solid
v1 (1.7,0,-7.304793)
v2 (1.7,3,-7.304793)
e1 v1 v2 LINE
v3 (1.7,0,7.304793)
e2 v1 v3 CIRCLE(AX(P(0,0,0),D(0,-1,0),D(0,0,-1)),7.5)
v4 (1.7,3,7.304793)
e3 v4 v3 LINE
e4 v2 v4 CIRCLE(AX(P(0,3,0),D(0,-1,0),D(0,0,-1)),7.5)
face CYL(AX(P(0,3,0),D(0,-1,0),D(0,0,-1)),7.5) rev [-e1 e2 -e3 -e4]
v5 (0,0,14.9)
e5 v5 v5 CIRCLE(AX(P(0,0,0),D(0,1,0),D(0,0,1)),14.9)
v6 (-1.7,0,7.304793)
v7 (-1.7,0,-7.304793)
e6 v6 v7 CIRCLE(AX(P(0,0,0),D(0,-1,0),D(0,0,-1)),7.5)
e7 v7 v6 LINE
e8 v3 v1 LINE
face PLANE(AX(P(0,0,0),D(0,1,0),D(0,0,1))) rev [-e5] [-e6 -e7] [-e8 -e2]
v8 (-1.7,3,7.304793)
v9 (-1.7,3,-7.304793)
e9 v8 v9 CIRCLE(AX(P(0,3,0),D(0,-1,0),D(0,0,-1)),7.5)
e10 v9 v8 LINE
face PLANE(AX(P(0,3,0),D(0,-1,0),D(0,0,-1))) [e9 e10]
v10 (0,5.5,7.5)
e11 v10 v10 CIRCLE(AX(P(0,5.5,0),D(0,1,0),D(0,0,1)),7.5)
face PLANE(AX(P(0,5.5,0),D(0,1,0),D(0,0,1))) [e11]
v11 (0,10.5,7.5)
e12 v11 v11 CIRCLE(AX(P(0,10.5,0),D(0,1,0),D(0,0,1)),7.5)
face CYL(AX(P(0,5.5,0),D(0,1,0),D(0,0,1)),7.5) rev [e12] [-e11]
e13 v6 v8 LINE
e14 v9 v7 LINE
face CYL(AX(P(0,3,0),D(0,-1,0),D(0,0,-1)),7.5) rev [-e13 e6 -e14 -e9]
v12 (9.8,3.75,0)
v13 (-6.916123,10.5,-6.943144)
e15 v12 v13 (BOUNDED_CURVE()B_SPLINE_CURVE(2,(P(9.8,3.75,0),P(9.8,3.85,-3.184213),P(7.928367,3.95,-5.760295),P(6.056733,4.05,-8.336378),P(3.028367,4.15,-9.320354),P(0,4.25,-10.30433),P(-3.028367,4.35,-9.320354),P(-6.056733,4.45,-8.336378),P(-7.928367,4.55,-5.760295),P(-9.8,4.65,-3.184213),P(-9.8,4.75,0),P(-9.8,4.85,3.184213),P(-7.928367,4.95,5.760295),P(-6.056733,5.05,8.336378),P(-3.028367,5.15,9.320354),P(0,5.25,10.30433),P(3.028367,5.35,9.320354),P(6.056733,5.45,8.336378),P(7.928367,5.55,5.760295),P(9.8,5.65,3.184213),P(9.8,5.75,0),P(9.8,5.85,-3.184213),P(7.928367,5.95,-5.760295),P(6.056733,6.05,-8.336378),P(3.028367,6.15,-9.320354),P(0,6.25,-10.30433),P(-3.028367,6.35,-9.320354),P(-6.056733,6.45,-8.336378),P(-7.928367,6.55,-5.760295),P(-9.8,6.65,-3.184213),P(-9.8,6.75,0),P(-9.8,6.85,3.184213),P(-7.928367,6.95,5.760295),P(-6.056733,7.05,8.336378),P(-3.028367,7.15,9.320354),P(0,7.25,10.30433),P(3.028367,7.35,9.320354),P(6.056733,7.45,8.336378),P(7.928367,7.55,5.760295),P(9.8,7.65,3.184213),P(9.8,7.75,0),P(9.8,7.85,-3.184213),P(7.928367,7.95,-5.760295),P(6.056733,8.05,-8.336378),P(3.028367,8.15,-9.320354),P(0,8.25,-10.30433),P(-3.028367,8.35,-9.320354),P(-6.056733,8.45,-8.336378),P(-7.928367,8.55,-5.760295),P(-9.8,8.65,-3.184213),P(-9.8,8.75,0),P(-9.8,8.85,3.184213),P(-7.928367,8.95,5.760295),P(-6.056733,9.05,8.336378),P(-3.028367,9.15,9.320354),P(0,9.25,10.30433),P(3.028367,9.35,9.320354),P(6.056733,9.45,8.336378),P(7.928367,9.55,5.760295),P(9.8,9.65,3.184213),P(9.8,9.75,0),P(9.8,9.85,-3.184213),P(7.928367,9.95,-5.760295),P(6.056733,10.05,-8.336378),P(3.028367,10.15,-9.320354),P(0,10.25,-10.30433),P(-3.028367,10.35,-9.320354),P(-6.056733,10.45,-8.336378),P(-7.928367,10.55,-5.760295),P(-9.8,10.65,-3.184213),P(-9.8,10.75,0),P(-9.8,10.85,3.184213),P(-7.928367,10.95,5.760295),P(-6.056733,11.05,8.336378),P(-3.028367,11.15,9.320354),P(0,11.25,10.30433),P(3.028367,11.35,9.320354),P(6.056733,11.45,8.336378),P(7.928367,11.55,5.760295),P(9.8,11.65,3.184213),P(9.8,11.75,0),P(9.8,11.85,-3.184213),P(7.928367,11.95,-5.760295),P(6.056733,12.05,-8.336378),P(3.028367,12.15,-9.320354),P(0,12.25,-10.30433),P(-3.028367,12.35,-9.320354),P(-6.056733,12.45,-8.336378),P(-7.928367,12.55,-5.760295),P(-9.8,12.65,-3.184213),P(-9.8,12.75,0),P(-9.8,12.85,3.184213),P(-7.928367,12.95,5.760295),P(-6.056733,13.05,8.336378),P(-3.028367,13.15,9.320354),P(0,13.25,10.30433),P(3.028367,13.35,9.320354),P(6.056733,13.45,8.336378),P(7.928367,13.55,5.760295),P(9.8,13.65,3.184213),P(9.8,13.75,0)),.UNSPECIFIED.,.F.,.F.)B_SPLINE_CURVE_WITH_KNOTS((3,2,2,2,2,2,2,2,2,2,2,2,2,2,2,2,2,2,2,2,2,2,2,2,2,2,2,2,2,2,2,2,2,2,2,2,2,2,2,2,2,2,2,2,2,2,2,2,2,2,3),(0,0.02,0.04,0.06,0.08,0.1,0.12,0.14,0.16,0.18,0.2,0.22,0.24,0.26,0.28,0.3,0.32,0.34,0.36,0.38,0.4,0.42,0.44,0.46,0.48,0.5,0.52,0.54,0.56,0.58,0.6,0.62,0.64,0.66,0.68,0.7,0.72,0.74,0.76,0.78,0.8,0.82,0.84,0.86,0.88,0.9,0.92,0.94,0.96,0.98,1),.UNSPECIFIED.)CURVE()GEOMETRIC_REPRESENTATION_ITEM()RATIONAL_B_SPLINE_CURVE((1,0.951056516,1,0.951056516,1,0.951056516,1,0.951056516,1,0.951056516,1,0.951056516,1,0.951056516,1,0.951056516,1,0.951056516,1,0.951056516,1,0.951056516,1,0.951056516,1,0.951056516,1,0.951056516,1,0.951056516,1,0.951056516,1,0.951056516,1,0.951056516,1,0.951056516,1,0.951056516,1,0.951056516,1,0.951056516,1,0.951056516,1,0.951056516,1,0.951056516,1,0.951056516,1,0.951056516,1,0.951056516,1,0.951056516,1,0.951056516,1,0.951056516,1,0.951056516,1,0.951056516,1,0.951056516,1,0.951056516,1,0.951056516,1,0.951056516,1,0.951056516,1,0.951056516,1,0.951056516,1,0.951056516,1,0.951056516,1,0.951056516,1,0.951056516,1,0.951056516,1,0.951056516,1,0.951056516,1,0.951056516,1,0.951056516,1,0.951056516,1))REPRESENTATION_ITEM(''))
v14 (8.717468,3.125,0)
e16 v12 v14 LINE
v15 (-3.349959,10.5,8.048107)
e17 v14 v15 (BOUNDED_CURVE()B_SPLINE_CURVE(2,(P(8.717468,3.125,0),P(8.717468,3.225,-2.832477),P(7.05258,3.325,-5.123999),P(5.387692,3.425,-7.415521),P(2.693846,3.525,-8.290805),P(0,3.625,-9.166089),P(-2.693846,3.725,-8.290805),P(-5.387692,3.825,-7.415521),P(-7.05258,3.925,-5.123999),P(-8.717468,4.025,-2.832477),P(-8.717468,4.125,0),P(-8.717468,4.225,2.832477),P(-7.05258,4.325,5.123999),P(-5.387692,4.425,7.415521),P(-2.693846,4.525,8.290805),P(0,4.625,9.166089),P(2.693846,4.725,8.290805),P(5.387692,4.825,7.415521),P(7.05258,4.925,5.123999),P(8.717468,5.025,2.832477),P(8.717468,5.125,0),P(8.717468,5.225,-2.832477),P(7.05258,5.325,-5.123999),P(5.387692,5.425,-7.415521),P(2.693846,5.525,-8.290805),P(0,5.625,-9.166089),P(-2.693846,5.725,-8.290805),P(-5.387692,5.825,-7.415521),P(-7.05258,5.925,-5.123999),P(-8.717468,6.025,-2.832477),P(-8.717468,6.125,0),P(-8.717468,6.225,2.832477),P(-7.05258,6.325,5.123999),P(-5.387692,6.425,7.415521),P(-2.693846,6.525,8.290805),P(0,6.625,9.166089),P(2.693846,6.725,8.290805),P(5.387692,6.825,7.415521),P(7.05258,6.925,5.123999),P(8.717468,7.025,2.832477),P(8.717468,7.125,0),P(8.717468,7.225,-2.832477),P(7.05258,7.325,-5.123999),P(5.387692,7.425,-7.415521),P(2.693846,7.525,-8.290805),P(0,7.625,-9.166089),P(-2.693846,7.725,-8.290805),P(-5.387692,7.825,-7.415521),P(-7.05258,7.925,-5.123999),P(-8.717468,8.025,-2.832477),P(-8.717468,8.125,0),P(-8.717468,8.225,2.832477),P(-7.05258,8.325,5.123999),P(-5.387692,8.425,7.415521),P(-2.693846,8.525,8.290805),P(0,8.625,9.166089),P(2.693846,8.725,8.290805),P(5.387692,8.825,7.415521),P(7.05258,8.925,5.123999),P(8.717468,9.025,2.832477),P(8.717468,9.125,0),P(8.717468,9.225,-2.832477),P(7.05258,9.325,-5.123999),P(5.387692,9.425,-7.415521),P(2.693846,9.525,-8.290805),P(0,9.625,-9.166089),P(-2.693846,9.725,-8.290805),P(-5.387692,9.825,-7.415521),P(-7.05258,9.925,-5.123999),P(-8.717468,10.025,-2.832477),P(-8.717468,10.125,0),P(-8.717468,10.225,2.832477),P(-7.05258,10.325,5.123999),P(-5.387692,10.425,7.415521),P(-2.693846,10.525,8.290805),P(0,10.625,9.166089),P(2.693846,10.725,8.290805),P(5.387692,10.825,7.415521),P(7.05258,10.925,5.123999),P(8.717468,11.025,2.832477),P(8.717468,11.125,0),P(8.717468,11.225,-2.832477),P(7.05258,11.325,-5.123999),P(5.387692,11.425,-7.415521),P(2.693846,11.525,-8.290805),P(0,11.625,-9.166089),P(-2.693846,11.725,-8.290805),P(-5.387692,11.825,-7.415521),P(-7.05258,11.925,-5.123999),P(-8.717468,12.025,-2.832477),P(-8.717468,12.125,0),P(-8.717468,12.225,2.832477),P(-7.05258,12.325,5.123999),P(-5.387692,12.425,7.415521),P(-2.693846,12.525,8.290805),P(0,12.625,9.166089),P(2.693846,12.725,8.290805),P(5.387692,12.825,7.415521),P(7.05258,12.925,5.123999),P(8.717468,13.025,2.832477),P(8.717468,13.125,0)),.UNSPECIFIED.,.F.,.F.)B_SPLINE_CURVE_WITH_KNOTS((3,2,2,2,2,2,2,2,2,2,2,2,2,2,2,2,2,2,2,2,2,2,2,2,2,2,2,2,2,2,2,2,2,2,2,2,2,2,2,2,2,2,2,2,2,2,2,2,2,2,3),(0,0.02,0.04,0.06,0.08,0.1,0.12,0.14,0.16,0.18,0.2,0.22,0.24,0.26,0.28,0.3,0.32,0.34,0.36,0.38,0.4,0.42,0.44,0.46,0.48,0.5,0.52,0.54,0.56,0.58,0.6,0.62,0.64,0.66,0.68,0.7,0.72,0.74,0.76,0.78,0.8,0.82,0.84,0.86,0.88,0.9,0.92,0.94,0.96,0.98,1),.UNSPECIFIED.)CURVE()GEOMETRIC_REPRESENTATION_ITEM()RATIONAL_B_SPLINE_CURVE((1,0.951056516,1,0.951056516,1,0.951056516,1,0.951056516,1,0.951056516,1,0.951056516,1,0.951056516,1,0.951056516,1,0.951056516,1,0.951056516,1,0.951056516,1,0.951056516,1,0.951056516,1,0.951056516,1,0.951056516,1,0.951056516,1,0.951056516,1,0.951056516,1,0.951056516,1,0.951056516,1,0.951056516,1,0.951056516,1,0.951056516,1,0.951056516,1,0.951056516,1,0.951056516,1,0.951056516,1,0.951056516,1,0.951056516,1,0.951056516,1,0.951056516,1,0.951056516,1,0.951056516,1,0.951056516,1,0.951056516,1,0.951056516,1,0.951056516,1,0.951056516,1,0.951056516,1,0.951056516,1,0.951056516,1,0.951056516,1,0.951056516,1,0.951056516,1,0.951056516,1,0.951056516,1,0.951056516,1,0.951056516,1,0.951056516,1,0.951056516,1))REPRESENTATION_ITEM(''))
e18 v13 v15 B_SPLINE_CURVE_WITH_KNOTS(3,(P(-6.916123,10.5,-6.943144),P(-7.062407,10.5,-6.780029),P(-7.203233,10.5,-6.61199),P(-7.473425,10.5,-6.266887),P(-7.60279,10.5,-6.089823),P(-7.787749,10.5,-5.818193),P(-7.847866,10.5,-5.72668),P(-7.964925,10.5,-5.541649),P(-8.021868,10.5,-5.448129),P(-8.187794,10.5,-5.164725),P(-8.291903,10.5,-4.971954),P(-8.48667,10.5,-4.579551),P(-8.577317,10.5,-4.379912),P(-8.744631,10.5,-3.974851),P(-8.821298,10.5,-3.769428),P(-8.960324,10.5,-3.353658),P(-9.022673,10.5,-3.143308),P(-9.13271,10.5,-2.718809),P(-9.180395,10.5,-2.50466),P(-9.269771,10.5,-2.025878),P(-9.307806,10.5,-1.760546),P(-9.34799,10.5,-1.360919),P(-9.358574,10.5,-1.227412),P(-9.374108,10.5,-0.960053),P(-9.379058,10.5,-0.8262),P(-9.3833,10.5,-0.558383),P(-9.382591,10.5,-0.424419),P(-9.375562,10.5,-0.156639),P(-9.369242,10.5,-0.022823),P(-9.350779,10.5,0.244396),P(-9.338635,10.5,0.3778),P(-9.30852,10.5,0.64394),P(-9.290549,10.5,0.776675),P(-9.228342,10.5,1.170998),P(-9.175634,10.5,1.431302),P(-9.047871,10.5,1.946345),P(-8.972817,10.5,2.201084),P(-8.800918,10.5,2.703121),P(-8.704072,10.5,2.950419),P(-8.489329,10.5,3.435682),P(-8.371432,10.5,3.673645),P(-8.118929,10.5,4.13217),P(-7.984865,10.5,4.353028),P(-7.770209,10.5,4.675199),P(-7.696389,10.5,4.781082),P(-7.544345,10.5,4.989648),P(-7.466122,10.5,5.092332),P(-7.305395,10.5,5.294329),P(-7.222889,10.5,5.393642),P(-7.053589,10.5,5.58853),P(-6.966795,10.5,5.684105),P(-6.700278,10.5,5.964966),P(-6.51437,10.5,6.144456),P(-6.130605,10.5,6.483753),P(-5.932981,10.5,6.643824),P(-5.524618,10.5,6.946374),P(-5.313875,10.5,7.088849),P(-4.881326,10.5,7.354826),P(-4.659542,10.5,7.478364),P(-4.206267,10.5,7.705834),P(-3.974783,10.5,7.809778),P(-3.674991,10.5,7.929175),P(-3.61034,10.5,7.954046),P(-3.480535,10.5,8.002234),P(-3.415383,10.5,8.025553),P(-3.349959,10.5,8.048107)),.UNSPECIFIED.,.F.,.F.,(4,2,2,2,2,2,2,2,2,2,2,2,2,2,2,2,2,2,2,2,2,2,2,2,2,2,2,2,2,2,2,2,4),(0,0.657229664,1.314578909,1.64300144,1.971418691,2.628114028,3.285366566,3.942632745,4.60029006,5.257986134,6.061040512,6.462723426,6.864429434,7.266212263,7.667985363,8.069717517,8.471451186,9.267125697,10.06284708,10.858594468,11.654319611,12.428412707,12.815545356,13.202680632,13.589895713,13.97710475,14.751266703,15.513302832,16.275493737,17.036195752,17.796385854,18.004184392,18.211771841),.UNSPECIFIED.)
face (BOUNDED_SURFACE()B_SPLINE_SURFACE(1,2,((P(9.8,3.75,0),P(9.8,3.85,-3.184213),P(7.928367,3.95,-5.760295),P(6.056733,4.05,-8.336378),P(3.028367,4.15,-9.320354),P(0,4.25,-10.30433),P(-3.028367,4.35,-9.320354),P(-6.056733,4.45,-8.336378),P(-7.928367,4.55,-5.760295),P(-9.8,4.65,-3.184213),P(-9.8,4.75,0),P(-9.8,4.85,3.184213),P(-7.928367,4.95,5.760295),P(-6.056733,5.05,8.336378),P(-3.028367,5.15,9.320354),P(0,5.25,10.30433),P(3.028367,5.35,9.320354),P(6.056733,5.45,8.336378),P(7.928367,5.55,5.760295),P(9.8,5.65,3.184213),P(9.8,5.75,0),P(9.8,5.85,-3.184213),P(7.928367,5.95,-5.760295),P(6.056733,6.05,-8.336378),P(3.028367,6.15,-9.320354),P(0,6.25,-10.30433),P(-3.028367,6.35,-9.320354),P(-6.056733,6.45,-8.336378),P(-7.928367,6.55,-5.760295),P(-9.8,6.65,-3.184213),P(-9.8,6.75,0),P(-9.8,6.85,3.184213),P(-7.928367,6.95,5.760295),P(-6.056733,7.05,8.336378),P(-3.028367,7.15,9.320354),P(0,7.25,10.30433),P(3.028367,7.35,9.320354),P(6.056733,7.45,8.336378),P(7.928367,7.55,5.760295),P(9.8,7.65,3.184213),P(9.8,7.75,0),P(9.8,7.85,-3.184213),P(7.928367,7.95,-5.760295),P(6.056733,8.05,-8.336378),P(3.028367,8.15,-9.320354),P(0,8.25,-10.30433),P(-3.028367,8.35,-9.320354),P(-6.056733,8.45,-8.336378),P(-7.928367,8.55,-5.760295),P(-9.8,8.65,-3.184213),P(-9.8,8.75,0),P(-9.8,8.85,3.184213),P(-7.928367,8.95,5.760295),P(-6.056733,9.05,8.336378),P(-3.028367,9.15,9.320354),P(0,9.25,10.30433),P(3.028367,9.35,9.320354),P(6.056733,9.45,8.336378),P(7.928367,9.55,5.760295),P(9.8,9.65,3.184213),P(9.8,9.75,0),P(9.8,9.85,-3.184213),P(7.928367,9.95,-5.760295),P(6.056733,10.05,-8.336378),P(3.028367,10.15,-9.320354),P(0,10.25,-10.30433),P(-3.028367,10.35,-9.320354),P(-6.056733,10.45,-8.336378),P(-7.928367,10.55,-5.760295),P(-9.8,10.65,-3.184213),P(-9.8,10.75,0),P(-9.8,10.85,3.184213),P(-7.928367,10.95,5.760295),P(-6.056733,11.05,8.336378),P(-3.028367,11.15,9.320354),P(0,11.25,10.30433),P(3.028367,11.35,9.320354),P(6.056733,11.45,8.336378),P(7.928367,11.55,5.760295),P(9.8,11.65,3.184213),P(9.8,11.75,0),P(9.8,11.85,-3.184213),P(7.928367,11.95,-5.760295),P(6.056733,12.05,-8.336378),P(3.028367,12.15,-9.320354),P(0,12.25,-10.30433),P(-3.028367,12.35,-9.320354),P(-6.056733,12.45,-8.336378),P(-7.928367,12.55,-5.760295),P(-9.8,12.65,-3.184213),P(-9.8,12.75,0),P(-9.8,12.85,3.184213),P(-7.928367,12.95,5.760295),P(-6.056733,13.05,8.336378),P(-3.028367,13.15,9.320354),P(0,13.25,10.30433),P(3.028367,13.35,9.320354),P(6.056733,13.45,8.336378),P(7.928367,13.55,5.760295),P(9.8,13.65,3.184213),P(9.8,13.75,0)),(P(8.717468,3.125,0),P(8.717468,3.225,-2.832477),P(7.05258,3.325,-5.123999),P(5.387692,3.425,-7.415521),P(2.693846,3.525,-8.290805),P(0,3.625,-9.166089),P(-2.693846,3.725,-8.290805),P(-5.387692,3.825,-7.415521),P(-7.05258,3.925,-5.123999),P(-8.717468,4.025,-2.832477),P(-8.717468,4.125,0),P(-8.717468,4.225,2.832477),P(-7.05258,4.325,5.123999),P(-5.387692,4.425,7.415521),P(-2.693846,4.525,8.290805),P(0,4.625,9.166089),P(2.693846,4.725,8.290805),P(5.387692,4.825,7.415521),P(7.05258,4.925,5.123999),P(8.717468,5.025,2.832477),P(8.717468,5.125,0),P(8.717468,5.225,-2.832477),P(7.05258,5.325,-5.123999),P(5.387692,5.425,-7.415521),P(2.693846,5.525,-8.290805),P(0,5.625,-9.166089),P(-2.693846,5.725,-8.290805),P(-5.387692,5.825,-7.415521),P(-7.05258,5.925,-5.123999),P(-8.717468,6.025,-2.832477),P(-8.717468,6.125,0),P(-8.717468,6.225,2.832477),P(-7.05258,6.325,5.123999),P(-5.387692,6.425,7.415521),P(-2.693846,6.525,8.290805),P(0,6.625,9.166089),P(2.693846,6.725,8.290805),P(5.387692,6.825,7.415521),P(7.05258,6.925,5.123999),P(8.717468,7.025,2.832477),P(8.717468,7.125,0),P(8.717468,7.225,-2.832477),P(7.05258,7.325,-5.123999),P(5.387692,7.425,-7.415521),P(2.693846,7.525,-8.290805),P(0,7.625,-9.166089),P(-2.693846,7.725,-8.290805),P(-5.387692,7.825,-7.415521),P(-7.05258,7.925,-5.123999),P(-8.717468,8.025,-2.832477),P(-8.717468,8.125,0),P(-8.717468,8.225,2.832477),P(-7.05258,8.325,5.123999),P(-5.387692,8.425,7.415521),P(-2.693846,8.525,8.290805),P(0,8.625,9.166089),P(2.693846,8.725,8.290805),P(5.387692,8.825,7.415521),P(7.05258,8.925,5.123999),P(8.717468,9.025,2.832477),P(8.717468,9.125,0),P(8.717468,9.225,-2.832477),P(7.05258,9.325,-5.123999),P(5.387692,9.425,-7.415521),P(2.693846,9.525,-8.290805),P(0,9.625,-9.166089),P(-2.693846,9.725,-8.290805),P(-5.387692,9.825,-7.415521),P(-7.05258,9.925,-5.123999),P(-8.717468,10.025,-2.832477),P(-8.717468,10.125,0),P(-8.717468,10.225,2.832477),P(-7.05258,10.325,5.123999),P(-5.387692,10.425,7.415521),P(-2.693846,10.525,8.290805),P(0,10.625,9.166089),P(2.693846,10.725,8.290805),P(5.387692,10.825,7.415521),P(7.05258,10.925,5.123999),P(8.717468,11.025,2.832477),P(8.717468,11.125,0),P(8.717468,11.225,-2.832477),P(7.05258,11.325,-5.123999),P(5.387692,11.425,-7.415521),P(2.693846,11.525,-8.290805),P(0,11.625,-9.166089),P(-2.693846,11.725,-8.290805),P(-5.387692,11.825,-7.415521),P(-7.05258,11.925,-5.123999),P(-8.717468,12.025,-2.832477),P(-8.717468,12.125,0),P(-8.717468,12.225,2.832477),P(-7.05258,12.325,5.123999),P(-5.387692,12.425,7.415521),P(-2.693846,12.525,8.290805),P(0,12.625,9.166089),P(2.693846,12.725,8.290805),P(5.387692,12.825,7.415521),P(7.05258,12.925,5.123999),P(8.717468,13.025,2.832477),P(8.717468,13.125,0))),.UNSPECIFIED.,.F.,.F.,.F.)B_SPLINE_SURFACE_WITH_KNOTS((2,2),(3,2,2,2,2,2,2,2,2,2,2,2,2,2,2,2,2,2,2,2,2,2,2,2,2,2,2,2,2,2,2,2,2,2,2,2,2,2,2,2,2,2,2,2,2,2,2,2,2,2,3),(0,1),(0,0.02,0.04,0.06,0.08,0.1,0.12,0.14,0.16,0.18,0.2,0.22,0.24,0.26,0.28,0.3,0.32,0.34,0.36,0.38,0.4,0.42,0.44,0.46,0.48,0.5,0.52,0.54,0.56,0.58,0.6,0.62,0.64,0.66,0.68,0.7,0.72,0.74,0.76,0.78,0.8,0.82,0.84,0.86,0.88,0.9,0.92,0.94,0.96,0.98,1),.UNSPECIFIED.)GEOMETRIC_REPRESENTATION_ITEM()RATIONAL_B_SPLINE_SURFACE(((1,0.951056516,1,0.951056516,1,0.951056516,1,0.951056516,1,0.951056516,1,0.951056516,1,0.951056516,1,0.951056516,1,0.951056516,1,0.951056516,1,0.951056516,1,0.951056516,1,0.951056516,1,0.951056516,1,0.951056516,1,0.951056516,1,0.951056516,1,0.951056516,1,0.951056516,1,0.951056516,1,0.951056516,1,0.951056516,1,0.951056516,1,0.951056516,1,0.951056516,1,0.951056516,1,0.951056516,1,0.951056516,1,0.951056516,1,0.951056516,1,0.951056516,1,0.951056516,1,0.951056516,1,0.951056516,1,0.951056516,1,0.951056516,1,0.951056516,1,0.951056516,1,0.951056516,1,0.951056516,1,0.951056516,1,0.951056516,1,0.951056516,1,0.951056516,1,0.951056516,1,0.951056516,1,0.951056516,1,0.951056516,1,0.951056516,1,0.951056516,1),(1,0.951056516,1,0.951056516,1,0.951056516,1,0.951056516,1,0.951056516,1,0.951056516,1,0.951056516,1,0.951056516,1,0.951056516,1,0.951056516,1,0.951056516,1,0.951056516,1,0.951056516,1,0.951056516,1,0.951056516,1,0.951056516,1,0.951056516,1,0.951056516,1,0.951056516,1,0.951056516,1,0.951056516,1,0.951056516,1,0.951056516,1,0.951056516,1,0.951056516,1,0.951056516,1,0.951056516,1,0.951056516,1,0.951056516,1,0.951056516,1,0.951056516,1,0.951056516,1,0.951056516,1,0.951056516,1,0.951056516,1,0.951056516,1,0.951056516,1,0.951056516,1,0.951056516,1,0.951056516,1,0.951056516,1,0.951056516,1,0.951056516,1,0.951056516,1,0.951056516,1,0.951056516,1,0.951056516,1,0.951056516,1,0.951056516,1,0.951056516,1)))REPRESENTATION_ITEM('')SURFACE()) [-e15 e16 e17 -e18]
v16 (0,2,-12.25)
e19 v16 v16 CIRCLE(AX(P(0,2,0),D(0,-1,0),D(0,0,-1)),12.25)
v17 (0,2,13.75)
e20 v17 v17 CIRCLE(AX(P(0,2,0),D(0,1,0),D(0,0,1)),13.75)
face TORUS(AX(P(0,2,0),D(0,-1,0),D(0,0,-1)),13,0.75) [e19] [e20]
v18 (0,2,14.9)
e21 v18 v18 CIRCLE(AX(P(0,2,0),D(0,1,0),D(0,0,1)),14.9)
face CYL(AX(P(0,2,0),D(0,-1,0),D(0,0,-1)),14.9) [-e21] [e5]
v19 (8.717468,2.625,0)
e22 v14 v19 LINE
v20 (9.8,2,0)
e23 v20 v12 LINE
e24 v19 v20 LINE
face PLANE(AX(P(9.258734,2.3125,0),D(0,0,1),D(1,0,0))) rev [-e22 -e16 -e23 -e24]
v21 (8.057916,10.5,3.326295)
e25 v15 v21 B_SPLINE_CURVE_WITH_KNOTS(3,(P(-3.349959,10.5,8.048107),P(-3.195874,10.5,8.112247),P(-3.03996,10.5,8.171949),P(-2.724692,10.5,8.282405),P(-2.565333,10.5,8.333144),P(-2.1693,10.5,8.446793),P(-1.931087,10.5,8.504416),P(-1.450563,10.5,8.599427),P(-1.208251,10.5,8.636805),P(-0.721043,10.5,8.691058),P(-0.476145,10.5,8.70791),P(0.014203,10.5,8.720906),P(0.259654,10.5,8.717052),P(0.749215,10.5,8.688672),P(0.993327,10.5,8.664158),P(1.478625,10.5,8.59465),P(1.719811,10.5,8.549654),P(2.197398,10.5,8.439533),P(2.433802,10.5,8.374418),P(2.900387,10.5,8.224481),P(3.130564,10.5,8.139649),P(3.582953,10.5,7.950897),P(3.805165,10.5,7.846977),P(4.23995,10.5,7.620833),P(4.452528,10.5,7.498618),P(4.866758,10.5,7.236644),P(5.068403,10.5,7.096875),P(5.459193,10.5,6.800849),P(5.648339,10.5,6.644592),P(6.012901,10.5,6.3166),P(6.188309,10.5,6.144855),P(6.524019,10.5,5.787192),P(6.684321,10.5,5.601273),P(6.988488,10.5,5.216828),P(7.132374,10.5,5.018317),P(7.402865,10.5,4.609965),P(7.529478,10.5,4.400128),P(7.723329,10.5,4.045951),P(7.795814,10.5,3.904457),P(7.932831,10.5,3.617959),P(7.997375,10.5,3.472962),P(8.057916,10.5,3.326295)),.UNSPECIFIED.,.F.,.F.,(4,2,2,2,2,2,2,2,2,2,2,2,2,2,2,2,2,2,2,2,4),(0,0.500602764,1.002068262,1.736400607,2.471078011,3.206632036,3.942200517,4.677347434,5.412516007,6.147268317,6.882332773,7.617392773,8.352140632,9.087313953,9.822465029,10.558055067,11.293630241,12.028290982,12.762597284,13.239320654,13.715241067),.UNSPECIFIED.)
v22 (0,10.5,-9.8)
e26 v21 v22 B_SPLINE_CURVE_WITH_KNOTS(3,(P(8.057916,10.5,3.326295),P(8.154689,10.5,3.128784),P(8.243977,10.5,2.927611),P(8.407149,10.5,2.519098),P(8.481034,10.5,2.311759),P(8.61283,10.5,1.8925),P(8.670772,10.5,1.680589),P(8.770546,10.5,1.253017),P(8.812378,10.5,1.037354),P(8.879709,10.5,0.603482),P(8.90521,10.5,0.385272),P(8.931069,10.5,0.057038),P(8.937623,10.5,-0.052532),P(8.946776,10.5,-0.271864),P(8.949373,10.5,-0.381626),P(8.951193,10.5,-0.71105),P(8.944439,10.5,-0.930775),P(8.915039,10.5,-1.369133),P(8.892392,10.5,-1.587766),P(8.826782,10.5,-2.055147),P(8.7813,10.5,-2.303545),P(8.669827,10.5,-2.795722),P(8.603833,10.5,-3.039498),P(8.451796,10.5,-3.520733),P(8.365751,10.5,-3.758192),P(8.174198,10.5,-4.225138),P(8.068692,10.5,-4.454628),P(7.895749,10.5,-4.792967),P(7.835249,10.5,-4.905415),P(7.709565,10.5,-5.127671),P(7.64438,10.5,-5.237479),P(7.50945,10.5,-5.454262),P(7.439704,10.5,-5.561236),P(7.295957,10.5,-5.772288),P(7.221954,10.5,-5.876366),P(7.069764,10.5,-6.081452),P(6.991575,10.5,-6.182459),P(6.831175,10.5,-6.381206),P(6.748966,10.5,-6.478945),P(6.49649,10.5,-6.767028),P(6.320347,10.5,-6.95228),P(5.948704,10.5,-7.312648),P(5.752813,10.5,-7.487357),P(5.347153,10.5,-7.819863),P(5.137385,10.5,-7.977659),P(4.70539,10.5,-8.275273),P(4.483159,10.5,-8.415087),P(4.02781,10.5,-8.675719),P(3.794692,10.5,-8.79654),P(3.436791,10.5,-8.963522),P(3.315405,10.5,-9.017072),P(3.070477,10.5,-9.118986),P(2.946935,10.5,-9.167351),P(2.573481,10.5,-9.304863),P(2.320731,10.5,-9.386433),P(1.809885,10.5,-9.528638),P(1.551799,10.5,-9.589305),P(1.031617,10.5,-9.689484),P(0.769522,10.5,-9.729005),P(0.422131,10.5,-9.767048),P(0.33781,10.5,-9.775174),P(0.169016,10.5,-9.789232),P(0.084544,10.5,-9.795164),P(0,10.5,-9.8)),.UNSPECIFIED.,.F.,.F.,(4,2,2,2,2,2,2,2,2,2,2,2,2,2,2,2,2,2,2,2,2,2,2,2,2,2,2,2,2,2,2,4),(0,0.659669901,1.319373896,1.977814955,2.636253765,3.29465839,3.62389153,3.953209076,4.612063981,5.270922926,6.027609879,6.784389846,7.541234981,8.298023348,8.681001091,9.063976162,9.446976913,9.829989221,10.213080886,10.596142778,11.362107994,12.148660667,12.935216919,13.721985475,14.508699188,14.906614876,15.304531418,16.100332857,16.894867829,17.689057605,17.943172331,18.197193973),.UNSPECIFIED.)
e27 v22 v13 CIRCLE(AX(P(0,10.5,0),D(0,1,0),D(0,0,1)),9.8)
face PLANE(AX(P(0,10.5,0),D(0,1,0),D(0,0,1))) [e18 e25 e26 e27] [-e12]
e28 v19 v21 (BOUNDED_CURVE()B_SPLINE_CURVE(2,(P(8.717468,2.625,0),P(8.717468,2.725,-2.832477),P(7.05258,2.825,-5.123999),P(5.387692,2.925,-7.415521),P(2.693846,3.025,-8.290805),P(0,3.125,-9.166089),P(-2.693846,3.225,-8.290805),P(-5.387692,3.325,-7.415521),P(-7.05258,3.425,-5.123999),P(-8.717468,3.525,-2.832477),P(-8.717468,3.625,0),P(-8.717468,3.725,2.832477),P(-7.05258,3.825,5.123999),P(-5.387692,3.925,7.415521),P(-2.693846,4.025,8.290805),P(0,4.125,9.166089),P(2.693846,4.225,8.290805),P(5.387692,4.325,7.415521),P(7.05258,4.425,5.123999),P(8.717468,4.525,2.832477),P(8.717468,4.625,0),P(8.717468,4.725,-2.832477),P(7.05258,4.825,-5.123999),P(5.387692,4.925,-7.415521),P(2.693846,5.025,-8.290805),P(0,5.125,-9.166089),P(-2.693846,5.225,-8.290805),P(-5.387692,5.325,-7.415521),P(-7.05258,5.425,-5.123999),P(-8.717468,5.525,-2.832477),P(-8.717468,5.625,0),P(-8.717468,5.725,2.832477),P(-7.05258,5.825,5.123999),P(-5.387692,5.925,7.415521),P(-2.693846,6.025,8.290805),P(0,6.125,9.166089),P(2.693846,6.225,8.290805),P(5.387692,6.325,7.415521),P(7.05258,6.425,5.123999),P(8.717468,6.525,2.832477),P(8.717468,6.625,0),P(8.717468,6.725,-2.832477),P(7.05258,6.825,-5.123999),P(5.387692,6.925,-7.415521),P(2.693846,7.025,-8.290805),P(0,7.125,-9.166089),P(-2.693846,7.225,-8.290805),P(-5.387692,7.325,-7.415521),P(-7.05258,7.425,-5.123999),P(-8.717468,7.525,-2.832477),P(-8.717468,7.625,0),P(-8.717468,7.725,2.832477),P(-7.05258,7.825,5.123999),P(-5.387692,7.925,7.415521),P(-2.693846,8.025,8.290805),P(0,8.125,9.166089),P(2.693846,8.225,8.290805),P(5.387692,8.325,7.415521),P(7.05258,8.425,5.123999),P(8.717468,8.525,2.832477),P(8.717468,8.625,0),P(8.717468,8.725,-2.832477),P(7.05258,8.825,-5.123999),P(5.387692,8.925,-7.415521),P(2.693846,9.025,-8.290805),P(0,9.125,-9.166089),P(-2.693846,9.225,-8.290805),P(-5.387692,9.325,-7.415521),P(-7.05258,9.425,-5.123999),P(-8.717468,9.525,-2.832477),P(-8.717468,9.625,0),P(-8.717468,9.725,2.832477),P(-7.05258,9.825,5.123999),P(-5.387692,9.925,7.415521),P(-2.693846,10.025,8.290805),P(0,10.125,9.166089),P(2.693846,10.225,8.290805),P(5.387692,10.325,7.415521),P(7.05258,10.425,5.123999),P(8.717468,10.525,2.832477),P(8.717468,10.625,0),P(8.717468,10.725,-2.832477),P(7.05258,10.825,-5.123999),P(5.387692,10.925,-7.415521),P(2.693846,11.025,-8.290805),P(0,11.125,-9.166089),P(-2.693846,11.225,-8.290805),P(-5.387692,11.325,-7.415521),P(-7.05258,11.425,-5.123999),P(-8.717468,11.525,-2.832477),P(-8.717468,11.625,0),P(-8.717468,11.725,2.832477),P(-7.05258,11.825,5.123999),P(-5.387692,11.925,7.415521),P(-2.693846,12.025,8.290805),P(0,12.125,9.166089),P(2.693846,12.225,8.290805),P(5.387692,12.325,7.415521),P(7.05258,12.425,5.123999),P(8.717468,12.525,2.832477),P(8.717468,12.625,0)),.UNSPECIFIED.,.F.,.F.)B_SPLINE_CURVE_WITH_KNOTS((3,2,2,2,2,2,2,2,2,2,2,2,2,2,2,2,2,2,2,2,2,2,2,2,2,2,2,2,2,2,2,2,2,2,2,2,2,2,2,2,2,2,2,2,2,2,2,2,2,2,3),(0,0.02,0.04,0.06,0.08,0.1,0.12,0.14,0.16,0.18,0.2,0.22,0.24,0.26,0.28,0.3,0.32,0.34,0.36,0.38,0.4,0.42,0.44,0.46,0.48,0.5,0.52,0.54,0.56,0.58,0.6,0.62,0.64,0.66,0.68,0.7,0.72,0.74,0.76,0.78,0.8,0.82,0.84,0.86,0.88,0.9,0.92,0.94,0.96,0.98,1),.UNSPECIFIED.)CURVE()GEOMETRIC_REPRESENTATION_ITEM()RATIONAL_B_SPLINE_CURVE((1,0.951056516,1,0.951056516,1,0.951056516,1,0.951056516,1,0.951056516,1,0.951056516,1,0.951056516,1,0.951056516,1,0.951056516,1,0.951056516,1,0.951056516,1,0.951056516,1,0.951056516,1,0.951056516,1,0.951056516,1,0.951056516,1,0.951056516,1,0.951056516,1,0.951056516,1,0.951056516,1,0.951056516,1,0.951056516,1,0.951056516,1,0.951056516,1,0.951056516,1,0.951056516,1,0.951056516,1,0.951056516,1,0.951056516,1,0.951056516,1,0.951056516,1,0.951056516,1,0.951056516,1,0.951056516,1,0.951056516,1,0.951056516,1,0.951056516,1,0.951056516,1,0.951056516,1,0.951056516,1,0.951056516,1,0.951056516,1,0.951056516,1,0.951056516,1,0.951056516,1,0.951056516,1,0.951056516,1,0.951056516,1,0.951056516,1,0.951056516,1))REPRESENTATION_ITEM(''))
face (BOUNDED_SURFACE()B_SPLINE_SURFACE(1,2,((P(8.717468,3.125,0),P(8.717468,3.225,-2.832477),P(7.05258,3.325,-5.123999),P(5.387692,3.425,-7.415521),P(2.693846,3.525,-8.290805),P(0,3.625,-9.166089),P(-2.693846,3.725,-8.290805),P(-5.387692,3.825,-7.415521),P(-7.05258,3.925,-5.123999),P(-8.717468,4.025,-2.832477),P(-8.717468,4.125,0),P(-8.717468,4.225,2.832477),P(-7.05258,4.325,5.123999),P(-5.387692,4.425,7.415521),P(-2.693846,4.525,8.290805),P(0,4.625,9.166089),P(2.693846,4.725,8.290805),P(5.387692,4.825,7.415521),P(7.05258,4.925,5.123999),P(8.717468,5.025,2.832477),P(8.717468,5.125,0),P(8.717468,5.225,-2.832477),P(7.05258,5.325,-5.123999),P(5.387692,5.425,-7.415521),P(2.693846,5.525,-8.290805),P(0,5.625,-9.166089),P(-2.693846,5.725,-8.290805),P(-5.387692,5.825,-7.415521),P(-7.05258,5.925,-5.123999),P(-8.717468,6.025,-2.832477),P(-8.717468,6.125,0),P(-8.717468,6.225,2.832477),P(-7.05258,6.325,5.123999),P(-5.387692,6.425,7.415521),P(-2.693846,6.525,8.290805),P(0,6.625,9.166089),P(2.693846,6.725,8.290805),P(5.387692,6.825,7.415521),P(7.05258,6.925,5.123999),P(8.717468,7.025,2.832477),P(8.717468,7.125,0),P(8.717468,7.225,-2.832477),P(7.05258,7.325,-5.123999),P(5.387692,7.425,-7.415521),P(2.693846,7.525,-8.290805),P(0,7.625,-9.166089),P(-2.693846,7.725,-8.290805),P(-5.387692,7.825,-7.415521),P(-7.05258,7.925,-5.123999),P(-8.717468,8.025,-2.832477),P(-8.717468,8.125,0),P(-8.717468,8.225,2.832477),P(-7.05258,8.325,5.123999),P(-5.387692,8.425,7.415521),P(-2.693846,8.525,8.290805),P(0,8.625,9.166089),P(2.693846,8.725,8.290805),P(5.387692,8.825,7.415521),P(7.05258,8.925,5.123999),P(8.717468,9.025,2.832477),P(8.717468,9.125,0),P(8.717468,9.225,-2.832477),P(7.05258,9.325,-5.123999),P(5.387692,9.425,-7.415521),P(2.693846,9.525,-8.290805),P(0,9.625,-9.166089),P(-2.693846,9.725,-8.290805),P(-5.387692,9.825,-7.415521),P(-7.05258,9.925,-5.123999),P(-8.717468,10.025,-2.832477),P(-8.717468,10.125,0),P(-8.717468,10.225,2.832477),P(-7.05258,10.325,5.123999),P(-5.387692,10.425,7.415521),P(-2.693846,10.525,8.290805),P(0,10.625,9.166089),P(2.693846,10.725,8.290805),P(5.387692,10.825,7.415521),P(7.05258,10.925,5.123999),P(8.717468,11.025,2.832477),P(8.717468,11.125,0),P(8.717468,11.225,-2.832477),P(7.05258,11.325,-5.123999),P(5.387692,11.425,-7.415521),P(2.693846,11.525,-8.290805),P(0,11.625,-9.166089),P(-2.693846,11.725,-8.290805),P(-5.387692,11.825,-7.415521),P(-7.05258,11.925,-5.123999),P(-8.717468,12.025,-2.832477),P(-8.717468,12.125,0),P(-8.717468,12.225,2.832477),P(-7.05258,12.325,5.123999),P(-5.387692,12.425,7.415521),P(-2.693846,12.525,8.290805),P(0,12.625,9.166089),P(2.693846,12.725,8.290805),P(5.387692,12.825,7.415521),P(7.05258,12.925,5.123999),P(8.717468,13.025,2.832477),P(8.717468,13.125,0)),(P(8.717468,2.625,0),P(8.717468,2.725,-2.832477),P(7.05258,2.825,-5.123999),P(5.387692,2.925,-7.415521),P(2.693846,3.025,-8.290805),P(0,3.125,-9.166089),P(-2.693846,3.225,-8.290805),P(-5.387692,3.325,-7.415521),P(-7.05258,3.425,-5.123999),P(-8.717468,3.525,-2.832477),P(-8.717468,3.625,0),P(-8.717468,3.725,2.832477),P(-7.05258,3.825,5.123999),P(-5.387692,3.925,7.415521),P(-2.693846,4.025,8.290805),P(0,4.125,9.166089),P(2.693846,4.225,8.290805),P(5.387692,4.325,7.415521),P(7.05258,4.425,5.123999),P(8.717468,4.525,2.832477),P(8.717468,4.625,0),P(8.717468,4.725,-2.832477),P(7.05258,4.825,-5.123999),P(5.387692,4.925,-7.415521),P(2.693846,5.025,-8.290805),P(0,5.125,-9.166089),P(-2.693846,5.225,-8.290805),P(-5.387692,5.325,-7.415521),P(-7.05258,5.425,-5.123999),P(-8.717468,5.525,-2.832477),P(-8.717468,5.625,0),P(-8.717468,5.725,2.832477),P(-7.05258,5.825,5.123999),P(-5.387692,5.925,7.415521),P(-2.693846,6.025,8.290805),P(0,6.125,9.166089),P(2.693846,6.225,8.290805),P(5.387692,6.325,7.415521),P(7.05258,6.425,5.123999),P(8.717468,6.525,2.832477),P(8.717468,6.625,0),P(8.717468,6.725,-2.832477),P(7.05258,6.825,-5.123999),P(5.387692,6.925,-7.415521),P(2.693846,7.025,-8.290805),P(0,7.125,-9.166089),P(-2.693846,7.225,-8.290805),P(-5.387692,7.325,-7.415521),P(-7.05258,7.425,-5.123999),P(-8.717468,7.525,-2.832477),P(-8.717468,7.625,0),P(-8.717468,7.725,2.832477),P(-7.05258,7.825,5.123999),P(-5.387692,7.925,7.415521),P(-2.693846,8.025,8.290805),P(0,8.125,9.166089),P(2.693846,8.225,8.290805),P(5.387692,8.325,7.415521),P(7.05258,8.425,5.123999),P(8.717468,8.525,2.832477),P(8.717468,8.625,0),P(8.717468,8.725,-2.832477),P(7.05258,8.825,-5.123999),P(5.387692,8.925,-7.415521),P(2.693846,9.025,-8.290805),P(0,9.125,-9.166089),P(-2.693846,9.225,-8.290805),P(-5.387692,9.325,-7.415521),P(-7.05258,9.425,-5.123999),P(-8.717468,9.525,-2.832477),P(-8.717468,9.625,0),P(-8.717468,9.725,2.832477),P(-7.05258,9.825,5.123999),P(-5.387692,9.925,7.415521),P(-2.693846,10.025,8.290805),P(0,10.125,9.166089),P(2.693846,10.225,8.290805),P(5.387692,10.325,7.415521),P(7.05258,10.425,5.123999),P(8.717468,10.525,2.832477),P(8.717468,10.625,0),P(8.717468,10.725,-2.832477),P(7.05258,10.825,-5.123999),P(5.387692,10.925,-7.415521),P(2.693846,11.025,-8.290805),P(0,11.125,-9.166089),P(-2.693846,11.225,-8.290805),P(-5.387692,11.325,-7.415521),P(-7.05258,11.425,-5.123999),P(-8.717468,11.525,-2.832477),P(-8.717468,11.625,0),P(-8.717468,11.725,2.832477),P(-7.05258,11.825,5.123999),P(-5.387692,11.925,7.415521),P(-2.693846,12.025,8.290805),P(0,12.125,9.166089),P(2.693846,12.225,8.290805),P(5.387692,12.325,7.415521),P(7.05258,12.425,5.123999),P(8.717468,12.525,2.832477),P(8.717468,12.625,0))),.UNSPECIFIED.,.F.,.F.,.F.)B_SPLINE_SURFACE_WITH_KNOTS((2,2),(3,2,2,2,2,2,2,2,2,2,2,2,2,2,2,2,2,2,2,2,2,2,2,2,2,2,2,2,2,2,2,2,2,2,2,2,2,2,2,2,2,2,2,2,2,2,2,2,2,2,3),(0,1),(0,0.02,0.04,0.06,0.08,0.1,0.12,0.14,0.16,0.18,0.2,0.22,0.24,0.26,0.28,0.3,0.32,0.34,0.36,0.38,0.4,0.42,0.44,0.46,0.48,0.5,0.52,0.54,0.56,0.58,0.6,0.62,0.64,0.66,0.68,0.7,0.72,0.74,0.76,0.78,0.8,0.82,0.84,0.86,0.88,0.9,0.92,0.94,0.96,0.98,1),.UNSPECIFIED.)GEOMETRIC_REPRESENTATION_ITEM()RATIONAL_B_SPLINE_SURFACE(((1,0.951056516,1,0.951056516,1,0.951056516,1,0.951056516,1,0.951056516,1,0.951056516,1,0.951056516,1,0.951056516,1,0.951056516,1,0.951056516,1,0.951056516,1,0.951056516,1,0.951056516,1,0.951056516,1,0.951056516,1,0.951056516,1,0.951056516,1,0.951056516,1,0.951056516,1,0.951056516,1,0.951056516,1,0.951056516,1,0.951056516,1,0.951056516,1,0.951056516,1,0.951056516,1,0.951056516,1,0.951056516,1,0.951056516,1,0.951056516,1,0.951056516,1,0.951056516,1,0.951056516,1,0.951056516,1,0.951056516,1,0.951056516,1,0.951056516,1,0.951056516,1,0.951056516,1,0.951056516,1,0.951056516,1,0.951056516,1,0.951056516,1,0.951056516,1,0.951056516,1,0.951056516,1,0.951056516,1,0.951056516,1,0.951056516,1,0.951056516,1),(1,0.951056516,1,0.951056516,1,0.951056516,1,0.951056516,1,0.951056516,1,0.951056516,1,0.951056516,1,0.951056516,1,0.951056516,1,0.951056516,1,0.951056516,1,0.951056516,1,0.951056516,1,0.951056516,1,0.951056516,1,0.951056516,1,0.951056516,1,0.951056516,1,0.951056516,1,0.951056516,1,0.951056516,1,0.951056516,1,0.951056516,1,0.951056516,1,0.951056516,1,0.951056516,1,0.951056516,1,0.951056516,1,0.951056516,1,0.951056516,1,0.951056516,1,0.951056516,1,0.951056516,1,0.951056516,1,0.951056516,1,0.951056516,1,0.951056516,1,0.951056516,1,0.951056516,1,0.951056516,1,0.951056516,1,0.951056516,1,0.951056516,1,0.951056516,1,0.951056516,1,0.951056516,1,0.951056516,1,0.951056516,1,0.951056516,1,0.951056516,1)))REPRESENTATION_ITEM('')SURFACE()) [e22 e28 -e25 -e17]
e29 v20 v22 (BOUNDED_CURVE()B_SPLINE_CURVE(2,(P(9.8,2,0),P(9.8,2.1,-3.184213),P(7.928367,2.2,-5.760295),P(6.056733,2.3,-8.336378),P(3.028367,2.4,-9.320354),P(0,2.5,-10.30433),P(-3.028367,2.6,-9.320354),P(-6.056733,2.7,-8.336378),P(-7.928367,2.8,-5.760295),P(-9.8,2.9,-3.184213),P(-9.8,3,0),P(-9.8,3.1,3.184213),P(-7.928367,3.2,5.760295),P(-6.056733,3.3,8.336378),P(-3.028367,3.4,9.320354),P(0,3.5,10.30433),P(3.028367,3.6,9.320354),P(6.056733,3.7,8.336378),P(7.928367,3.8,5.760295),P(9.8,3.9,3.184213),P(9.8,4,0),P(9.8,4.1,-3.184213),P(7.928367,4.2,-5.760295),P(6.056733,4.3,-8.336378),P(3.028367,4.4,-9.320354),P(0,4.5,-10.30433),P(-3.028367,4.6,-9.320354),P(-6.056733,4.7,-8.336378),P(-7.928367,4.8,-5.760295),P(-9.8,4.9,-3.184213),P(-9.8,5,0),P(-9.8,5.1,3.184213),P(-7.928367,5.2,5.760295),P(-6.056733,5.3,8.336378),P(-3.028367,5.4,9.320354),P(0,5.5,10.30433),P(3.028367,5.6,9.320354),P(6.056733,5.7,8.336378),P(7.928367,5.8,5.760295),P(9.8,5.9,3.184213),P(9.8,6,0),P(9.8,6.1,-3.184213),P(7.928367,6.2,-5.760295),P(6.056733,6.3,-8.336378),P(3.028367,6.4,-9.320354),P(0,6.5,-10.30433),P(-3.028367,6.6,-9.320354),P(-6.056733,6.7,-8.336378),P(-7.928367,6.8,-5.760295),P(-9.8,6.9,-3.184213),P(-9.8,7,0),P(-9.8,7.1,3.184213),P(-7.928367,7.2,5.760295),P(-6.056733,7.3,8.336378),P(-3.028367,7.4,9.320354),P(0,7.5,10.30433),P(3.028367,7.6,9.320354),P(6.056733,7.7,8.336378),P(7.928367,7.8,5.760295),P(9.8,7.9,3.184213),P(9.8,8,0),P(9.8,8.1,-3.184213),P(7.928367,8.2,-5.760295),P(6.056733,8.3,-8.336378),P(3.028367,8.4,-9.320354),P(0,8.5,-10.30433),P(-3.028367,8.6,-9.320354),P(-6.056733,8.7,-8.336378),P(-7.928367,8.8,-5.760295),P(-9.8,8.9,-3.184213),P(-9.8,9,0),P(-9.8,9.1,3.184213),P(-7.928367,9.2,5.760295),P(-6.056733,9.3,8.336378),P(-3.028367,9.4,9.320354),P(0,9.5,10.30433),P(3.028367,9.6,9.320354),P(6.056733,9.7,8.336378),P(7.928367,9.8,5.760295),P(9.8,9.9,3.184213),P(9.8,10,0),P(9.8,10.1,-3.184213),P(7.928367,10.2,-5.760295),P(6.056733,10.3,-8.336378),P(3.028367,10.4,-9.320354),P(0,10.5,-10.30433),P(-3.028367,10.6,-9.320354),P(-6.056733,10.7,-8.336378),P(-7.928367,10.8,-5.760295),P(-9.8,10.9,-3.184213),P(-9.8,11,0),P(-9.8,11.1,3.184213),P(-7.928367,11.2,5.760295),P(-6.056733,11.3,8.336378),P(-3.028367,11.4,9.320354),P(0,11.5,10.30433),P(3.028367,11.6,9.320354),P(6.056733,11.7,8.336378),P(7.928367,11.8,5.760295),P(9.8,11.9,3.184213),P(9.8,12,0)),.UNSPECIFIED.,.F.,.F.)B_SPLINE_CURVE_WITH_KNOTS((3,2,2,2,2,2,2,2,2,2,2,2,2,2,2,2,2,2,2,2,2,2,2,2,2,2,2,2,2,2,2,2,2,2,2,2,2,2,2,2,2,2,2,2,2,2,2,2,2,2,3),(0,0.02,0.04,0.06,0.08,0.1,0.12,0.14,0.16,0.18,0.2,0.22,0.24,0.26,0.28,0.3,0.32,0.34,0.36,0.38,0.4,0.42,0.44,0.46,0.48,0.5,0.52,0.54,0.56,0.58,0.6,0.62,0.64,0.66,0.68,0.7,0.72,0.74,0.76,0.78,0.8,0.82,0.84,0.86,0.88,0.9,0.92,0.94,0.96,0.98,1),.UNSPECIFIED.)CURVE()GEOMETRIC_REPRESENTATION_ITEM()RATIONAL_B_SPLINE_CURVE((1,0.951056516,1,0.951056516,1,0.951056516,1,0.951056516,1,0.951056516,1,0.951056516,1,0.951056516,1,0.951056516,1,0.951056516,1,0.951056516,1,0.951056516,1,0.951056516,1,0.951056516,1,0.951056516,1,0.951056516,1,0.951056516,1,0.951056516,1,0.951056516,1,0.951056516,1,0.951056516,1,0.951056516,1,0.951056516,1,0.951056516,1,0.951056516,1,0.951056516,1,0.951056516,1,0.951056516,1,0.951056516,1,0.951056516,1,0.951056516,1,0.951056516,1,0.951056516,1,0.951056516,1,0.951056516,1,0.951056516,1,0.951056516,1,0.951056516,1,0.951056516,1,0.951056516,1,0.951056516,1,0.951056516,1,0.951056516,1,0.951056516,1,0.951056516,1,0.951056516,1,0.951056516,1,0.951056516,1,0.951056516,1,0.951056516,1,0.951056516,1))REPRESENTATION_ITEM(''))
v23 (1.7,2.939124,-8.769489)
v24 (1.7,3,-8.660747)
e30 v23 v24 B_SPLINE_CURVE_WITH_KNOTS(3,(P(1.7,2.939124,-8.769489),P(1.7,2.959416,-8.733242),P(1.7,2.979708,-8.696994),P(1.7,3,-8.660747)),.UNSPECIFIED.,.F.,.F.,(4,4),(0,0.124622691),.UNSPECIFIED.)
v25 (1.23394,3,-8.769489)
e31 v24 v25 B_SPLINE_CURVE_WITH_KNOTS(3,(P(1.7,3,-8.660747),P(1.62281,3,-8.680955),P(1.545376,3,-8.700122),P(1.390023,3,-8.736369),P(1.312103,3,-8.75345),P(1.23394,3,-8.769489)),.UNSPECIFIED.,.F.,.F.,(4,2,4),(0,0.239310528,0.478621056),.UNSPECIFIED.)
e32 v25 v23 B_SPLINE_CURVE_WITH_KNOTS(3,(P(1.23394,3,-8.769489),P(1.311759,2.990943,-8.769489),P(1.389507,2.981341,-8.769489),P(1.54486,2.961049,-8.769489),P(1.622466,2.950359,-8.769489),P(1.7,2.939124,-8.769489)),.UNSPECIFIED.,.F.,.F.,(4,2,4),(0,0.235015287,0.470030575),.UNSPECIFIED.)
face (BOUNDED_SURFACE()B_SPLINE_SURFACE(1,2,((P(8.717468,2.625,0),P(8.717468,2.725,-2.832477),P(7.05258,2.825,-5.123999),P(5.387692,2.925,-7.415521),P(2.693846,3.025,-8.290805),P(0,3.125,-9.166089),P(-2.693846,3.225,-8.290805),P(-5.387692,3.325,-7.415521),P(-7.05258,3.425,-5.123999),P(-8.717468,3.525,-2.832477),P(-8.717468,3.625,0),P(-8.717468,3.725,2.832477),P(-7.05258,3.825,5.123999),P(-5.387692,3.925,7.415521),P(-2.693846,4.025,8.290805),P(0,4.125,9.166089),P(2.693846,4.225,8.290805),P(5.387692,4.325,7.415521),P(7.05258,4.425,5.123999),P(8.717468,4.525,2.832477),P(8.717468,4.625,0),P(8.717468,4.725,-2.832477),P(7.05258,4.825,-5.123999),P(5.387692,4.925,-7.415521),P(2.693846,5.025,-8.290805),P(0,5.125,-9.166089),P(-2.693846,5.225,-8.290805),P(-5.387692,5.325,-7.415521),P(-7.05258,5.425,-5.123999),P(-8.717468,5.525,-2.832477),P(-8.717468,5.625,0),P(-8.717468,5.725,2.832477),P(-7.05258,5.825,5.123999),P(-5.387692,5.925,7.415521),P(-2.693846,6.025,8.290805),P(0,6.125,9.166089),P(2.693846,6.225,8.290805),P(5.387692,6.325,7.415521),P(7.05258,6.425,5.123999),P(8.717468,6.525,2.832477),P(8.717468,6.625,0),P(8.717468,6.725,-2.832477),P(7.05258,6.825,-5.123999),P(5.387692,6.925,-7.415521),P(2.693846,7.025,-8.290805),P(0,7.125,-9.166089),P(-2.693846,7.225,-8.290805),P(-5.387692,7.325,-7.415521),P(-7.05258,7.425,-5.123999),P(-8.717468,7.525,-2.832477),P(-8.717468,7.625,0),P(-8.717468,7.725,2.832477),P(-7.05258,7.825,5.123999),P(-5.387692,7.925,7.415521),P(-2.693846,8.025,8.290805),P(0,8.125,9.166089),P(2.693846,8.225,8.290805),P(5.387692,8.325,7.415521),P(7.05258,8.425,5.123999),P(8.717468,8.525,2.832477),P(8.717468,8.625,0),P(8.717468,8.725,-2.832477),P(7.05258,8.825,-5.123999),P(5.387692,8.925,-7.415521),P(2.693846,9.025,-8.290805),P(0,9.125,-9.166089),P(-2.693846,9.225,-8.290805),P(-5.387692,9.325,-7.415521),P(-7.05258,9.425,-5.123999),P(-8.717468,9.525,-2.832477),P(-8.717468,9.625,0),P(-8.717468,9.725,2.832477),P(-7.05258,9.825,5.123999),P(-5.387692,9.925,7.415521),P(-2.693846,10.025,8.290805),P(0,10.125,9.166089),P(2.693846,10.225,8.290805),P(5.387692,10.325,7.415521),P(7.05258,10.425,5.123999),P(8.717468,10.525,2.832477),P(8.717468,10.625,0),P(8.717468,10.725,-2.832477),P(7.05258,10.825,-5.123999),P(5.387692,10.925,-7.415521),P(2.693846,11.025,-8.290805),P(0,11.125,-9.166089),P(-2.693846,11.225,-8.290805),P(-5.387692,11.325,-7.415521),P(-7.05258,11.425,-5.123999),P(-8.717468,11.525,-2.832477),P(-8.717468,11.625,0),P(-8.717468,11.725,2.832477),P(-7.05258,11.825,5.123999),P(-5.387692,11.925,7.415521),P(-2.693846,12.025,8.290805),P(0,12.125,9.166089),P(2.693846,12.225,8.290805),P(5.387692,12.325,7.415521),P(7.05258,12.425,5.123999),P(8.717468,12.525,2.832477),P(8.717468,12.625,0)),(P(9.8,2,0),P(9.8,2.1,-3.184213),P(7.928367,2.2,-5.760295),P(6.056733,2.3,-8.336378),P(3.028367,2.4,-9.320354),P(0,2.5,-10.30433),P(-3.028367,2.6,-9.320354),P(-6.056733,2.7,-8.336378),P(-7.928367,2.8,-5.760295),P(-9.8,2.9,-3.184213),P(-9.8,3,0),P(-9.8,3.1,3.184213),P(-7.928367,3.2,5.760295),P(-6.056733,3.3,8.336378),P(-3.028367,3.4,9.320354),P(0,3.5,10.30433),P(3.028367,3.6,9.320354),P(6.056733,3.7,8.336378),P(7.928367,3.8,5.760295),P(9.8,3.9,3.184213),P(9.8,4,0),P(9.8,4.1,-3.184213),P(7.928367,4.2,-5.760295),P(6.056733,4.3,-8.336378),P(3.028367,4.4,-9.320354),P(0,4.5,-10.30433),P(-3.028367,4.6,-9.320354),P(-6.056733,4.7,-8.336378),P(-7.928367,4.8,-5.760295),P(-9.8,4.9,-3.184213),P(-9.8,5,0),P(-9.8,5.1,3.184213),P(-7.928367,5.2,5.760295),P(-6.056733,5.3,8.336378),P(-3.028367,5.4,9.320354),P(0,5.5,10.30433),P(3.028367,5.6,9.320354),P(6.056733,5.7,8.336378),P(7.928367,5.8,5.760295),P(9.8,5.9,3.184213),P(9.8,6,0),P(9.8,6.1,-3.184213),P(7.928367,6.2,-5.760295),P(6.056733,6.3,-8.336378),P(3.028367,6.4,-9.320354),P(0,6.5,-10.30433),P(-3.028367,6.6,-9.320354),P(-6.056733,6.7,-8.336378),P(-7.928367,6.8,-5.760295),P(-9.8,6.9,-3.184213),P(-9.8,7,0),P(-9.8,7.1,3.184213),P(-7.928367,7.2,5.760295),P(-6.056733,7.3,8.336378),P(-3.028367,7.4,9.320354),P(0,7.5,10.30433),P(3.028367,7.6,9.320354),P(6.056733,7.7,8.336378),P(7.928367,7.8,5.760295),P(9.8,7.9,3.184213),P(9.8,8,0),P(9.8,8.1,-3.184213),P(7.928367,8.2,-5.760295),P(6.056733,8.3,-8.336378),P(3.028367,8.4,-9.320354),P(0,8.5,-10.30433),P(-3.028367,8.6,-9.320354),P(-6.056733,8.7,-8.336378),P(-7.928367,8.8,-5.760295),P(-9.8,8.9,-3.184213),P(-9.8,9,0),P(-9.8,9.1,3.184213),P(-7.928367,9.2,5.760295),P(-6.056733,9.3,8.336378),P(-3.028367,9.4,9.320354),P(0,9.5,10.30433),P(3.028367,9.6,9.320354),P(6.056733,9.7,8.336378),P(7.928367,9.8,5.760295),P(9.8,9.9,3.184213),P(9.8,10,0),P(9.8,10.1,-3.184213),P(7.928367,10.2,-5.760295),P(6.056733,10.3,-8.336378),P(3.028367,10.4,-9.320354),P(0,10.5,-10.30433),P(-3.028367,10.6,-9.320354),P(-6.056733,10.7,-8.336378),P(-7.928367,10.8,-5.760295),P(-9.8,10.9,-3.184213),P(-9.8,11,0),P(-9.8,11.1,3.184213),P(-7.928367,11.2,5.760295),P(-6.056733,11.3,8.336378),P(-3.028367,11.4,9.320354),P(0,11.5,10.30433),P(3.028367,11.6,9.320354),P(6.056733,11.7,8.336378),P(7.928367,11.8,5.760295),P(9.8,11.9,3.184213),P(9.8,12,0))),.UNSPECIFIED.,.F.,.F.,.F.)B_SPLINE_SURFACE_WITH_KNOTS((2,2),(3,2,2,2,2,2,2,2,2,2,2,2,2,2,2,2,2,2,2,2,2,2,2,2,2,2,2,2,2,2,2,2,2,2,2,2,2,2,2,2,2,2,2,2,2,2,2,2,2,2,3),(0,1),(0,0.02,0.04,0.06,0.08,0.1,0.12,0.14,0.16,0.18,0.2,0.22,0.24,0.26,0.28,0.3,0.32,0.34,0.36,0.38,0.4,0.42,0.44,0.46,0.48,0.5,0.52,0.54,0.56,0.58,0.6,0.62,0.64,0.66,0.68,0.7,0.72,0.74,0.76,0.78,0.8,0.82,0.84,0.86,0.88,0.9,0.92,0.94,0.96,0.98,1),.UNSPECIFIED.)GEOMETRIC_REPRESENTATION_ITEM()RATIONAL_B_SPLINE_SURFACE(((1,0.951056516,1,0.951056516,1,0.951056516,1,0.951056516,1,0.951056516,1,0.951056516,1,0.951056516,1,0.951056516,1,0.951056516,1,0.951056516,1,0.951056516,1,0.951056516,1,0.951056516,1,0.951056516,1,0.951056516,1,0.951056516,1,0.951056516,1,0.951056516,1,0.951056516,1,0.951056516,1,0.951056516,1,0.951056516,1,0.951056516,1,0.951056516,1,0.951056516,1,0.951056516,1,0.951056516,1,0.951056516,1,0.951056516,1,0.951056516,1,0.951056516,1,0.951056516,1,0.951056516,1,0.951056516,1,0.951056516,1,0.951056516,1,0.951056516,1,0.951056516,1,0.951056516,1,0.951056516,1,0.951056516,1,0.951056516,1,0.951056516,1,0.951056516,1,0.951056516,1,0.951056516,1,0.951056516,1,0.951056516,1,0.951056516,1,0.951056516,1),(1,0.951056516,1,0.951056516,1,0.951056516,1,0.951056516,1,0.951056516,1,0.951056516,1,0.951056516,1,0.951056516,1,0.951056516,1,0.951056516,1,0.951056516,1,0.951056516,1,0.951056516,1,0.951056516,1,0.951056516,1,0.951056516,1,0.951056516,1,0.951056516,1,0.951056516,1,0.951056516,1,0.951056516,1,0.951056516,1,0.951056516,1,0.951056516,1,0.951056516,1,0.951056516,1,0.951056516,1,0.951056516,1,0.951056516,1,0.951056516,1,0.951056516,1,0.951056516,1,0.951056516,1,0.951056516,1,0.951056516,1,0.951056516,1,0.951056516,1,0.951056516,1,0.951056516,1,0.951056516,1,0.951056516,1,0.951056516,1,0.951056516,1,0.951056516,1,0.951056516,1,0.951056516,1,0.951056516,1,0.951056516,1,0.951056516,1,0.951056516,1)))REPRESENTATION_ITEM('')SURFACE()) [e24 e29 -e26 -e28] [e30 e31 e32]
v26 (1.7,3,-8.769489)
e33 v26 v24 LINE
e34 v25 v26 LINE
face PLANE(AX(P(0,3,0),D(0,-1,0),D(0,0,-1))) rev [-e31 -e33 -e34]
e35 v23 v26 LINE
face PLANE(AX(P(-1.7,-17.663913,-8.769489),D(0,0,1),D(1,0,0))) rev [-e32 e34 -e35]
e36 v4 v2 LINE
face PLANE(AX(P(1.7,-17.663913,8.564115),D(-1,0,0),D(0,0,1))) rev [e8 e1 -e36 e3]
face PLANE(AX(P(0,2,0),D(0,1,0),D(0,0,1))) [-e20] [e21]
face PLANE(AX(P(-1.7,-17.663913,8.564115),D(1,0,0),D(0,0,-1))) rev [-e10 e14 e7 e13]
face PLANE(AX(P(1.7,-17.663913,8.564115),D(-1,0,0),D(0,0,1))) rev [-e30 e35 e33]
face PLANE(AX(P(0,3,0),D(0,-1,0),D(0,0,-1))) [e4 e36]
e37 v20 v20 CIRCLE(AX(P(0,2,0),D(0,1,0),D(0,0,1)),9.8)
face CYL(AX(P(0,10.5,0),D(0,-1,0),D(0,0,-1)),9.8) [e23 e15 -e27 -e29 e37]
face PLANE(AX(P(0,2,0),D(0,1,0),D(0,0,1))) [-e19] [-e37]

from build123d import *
from build123d.topology import SkipClean

# Parameters (mm, degrees)
SKETCH1_R           = 14.9
BOSS_EXTRUDE1_DEPTH = 2
SKETCH2_R           = 9.8
BOSS_EXTRUDE2_DEPTH = 8.5
SKETCH3_R           = 7.5
CUT_EXTRUDE1_DEPTH  = 5
THREAD1_PITCH       = 2
CUT_EXTRUDE2_START  = -3
SKETCH7_R           = 7.5
CUT_EXTRUDE2_DEPTH  = 3
SKETCH9_W           = 3.4
SKETCH9_H           = 17.333603835
BOSS_EXTRUDE3_DEPTH = 3
SKETCH10_R          = 0.75


with BuildPart() as part:
    # Sketch1 → Boss-Extrude1 (new body)
    with BuildSketch(Plane(origin=(0, 0, 0), x_dir=(1, 0, 0), z_dir=(0, 1, 0))):
        with Locations(Location((0, 0, 0), (0, 0, 270))):
            Circle(SKETCH1_R)
    extrude(amount=BOSS_EXTRUDE1_DEPTH)

    # Sketch2 → Boss-Extrude2 (add)
    with BuildSketch(Plane(origin=(0, 2, 0), x_dir=(1, 0, 0), z_dir=(0, 1, 0))):
        with Locations(Location((0, 0, 0), (0, 0, 270))):
            Circle(SKETCH2_R)
    extrude(amount=BOSS_EXTRUDE2_DEPTH)

    # Sketch3 → Cut-Extrude1 (cut)
    with BuildSketch(Plane(origin=(0, 10.5, 0), x_dir=(1, 0, 0), z_dir=(0, 1, 0))):
        with Locations(Location((0, 0, 0), (0, 0, 270))):
            Circle(SKETCH3_R)
    extrude(amount=-CUT_EXTRUDE1_DEPTH, mode=Mode.SUBTRACT)

    # Thread1: the profile of Sketch5 profile screwed along a right-hand helix of 5 turns, 10 arcs to a turn; built about Z, then put on its axis
    with SkipClean():  # the faces are left unmerged after this step: merging them gives an invalid solid
        thread1_z = Axis((0, 0, 0), (0, 0, 1))
        thread1_corners = [(9.8003, 0, -0.000173205), (9.8003, 0, 1.7501732), (8.71746825, 0, 1.124999997), (8.71746825, 0, 0.624999997)]
        with BuildLine(mode=Mode.PRIVATE) as thread1_profile:
            Line(thread1_corners[0], thread1_corners[1])
            Line(thread1_corners[1], thread1_corners[2])
            Line(thread1_corners[2], thread1_corners[3])
            Line(thread1_corners[3], thread1_corners[0])
        thread1_cap = Face(thread1_profile.wire())
        thread1_turn_angles = [0, 18, 36, 54, 72, 90, 108, 126, 144, 162, 180, 198, 216, 234, 252, 270, 288, 306, 324, 342, 360]
        thread1_turn_weights = [1, 0.9510565162951535, 1, 0.9510565162951535, 1, 0.9510565162951535, 1, 0.9510565162951535, 1, 0.9510565162951535, 1, 0.9510565162951535, 1, 0.9510565162951535, 1, 0.9510565162951535, 1, 0.9510565162951535, 1, 0.9510565162951535, 1]
        thread1_turn_rails = [Edge.make_bspline([Vector(p[0], p[1], 0).rotate(thread1_z, thread1_turn_angles[k]) / thread1_turn_weights[k] + Vector(0, 0, p[2] + THREAD1_PITCH * thread1_turn_angles[k] / 360) for k in range(21)], [0, 0, 0, 1, 1, 2, 2, 3, 3, 4, 4, 5, 5, 6, 6, 7, 7, 8, 8, 9, 9, 10, 10, 10], 2, thread1_turn_weights) for p in thread1_corners]
        thread1_turn_sides = [Face.make_surface_from_curves(thread1_turn_rails[p[0]], thread1_turn_rails[p[1]]) for p in [(0, 1), (1, 2), (2, 3), (3, 0)]]
        thread1 = Plane(origin=(0, 2, 0), x_dir=(1, 0, 0), z_dir=(0, 1, 0)) * Solid(Shell([*[p.moved(Location((0, 0, THREAD1_PITCH * i))) for i in range(5) for p in thread1_turn_sides], thread1_cap, thread1_cap.rotate(thread1_z, 1800).moved(Location((0, 0, THREAD1_PITCH * 1800 / 360)))]))
        add(thread1, mode=Mode.SUBTRACT)

    # Sketch7 → Cut-Extrude2 (cut)
    with SkipClean():  # the faces are left unmerged after this step: merging them gives an invalid solid
        with BuildSketch(Plane.XZ.offset(CUT_EXTRUDE2_START)):
            with Locations(Location((0, 0, 0), (0, 0, 90))):
                Circle(SKETCH7_R)
        extrude(amount=CUT_EXTRUDE2_DEPTH, mode=Mode.SUBTRACT)

    # Sketch9 → Boss-Extrude3 (add)
    with SkipClean():  # the faces are left unmerged after this step: merging them gives an invalid solid
        with BuildSketch(Plane.XZ.offset(-3)):
            with Locations((0, -0.102687227)):
                Rectangle(SKETCH9_W, SKETCH9_H)
        extrude(amount=BOSS_EXTRUDE3_DEPTH)

    # Sketch10 → Revolve1 (revolve)
    with SkipClean():  # the faces are left unmerged after this step: merging them gives an invalid solid
        with BuildSketch(Plane.XY, mode=Mode.PRIVATE) as revolve1_sk:
            with Locations((13, 2)):
                Circle(SKETCH10_R)
        revolve(revolve1_sk.sketch.rotate(Axis((0, 0, 0), (0, 1, 0)), 90), axis=Axis((0, 0, 0), (0, 1, 0)))


solid = part.part
